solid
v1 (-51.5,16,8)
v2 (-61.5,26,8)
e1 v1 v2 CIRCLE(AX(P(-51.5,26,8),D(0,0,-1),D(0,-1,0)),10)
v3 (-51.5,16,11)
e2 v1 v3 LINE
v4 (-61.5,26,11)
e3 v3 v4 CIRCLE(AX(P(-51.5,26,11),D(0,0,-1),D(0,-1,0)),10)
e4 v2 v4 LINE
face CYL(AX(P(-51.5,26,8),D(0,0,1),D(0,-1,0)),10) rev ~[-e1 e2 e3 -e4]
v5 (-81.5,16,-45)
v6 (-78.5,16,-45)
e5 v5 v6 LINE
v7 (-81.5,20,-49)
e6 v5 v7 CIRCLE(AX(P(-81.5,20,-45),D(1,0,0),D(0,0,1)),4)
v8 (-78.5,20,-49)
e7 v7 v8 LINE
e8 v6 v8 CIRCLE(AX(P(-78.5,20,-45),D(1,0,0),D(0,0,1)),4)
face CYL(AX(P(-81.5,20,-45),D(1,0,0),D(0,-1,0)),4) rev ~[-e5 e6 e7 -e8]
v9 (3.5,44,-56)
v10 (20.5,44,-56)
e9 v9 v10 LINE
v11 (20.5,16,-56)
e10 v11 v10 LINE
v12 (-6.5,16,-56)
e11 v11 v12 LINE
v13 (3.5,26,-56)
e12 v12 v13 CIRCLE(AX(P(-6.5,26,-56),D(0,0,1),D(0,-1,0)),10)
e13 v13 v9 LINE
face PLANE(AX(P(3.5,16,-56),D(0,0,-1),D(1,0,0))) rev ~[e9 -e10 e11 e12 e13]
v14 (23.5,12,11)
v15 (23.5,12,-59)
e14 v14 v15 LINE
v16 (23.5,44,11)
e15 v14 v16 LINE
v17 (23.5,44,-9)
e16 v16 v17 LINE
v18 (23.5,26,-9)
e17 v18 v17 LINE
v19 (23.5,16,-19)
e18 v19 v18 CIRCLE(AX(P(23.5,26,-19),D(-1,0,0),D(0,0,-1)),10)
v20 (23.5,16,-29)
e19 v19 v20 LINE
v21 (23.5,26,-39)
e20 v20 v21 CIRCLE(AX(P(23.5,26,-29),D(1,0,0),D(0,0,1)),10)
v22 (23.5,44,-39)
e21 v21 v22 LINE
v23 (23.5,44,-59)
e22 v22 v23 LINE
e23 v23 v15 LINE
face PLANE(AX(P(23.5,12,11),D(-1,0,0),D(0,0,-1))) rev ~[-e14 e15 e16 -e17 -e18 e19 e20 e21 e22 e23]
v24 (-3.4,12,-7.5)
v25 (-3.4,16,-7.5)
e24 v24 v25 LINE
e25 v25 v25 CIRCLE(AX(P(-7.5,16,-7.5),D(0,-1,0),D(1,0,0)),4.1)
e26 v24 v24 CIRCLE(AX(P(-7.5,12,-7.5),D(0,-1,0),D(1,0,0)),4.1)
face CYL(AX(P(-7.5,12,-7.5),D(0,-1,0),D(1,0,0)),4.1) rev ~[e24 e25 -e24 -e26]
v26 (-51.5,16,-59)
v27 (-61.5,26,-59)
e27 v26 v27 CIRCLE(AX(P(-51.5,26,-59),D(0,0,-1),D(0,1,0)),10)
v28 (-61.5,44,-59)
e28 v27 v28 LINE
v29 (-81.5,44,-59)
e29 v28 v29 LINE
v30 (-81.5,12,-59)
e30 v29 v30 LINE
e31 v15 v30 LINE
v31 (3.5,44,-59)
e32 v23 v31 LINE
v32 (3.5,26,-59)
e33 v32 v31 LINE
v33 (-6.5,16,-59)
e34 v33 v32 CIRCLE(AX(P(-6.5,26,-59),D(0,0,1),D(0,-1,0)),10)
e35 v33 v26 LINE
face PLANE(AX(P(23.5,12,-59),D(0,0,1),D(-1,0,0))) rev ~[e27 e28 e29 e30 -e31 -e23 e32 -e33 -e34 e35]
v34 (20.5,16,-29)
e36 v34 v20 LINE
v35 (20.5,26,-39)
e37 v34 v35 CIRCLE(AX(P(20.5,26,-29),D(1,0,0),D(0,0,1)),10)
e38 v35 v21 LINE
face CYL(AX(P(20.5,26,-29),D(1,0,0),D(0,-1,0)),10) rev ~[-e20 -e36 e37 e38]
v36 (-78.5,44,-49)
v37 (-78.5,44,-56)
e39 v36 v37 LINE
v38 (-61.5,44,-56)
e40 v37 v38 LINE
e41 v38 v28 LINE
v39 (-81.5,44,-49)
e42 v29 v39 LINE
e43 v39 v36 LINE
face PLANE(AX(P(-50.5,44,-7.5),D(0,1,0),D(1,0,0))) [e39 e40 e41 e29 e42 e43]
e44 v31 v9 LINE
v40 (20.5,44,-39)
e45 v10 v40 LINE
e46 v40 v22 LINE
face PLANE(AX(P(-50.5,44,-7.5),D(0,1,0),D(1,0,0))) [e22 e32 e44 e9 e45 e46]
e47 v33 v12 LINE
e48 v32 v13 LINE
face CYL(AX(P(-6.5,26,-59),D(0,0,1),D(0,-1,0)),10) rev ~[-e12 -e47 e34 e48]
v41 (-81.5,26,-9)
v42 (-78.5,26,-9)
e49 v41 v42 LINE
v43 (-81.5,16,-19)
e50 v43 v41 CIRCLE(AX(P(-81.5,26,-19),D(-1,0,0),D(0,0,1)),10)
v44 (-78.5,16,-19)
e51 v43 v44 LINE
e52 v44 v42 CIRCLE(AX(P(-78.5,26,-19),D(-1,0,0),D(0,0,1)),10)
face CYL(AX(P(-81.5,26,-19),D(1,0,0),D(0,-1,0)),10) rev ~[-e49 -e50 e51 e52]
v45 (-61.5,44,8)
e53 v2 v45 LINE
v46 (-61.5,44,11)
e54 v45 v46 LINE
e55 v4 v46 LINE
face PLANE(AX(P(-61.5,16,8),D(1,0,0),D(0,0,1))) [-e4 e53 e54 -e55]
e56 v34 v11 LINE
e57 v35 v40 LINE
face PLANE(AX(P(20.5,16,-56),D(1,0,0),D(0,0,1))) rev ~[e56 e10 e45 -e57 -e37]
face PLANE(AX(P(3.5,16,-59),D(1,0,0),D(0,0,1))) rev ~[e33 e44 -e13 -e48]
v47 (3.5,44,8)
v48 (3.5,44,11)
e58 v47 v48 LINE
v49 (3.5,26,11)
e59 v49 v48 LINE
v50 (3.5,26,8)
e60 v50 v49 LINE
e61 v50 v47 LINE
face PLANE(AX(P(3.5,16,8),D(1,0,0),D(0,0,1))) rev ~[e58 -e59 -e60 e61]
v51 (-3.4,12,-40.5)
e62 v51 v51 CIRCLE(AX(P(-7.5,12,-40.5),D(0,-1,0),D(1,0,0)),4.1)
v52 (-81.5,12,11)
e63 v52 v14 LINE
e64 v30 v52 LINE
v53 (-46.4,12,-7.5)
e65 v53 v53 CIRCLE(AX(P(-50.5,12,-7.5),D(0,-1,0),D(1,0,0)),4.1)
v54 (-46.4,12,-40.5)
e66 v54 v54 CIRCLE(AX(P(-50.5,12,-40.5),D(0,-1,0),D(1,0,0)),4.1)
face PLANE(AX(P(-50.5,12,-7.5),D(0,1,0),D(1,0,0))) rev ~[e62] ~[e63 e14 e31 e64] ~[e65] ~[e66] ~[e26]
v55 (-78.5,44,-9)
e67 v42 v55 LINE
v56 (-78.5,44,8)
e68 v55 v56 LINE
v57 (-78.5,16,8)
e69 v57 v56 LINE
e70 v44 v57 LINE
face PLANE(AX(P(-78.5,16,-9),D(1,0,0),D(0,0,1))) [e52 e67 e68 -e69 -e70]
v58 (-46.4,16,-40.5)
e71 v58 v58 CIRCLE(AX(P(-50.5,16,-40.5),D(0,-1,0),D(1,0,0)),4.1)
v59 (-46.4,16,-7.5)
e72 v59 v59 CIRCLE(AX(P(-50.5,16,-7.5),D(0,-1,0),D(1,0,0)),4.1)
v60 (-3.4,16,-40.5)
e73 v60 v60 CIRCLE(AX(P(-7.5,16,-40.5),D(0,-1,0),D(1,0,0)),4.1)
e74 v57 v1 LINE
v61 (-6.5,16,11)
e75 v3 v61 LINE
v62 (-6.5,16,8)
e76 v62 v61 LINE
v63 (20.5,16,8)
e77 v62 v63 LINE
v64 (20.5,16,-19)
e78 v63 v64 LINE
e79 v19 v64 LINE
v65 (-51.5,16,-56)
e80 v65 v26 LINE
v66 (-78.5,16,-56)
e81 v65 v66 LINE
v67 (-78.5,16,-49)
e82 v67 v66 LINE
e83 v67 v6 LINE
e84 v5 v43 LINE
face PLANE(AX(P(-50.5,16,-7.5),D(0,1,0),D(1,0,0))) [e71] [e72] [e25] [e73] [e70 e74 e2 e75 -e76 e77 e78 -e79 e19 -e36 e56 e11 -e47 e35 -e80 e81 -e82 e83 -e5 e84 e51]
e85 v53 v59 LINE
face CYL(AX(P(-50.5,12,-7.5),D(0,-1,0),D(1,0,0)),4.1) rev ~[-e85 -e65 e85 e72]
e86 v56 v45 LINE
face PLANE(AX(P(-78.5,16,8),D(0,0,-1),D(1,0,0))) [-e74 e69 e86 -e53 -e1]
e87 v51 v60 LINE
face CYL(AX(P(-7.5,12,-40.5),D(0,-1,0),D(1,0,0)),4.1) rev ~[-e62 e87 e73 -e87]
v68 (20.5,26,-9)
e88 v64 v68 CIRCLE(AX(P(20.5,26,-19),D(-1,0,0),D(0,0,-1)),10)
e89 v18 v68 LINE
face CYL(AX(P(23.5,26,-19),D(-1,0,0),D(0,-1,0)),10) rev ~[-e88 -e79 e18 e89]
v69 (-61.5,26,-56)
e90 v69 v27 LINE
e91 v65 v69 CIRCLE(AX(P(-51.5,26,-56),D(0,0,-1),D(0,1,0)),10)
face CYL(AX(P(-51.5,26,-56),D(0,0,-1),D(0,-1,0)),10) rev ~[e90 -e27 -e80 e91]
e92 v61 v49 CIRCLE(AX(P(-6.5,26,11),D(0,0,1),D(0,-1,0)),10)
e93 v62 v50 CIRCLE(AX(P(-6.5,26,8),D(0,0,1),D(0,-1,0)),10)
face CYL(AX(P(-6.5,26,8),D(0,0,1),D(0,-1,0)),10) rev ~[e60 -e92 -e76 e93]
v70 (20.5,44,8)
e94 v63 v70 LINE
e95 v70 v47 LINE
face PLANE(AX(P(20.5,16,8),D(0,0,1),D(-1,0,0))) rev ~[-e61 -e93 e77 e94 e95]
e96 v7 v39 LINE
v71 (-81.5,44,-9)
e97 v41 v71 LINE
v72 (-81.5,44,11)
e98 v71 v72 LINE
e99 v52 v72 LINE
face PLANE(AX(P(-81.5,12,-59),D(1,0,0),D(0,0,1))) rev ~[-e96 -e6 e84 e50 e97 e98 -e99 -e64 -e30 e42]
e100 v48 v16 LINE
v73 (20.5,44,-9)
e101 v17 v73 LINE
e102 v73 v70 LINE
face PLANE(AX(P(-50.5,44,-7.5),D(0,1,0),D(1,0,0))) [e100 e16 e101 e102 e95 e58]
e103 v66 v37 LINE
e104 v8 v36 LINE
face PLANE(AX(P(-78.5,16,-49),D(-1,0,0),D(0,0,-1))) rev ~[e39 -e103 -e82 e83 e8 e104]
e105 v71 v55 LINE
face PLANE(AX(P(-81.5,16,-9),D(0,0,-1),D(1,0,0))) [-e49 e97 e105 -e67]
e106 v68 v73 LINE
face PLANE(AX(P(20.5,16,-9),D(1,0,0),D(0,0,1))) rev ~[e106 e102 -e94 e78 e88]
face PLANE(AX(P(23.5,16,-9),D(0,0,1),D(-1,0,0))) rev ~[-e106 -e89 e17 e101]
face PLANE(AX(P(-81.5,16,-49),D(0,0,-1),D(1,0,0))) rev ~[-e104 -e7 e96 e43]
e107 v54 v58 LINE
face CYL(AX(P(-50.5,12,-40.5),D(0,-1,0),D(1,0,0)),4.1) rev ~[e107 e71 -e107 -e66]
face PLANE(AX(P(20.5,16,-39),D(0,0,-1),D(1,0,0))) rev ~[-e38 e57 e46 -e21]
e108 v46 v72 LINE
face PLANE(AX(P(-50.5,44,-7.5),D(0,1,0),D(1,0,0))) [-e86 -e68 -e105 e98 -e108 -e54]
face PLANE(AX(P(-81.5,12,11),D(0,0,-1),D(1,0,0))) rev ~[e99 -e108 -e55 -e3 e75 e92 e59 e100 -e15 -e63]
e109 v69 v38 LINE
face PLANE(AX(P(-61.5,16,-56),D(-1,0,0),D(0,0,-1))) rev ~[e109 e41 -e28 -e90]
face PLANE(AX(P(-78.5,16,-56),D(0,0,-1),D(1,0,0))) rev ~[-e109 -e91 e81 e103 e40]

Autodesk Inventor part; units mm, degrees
ref_plane "YZ Plane" through (0, 0, 0) normal (1, 0, 0) x (0, 1, 0)
ref_plane "XZ Plane" through (0, 0, 0) normal (0, 1, 0) x (-1, 0, 0)
ref_plane "XY Plane" through (0, 0, 0) normal (0, 0, 1) x (1, 0, 0)
sketch "Sketch1" plane through (0, 0, 0) normal (0, 1, 0) x (-1, 0, 0)
  line L0 (0, 0) -> (58, 0) construction
  line L1 (58, 0) -> (58, -48) construction
  line L2 (58, -48) -> (0, -48) construction
  line L3 (0, -48) -> (0, 0) construction
  circle A0 centre (50.5, -7.5) radius 2.35
  circle A1 centre (50.5, -40.5) radius 2.35
  circle A2 centre (7.5, -7.5) radius 2.35
  circle A3 centre (7.5, -40.5) radius 2.35
  circle A4 centre (50.5, -7.5) radius 5
  circle A5 centre (50.5, -40.5) radius 5
  circle A6 centre (7.5, -7.5) radius 5
  circle A7 centre (7.5, -40.5) radius 5
  dimension "d0" = 58
  dimension "d1" = 48
  dimension "d2" = 4.7
  dimension "d3" = 4.7
  dimension "d4" = 4.7
  dimension "d5" = 4.7
  dimension "d6" = 33
  dimension "d7" = 43
  dimension "d8" = 7.5
  dimension "d9" = 7.5
  dimension "d10" = 7.5
  dimension "d11" = 7.5
  dimension "d12" = 7.5
  dimension "d13" = 7.5
  dimension "d14" = 10
  dimension "d15" = 10
  dimension "d16" = 10
  dimension "d17" = 10
extrude "Extrusion1" add sketch "Sketch1" along normal blind 12
sketch "Sketch2" plane through (-50.5, 12, -7.5) normal (0, 1, 0) x (1, 0, 0)
  line L0 (-31, -18.5) -> (74, -18.5)
  line L1 (74, -18.5) -> (74, 51.5)
  line L2 (74, 51.5) -> (-31, 51.5)
  line L3 (-31, 51.5) -> (-31, -18.5)
  circle A0 centre (0, 0) radius 2.35 projected
  circle A1 centre (0, 33) radius 2.35 projected
  circle A2 centre (43, 33) radius 2.35 projected
  circle A3 centre (43, 0) radius 2.35 projected
  circle A4 centre (43, 0) radius 2.35
  point P0 (50.5, -7.5)
  dimension "d20" = 105
  dimension "d21" = 70
  dimension "d22" = 18.5
  dimension "d23" = 31
extrude "Extrusion3" add sketch "Sketch2" along normal blind 4
sketch "Sketch3" plane through (-50.5, 16, -7.5) normal (0, 1, 0) x (1, 0, 0)
  line L0 (-31, 51.5) -> (-31, -18.5) projected
  line L1 (-31, -18.5) -> (-31, 1.5)
  line L2 (-31, 1.5) -> (-28, 1.5)
  line L3 (-28, 1.5) -> (-28, -15.5)
  line L4 (-28, -15.5) -> (-11, -15.5)
  line L5 (-11, -15.5) -> (-11, -18.5)
  line L6 (-11, -18.5) -> (-31, -18.5)
  line L7 (-28, 48.5) -> (-11, 48.5)
  line L8 (-11, 48.5) -> (-11, 51.5)
  line L9 (74, -18.5) -> (74, 51.5) projected
  line L10 (74, 51.5) -> (54, 51.5)
  line L11 (54, 51.5) -> (54, 48.5)
  line L12 (71, 31.5) -> (74, 31.5)
  line L13 (74, 31.5) -> (74, 51.5)
  line L14 (74, -18.5) -> (74, 1.5)
  line L15 (74, 1.5) -> (71, 1.5)
  line L16 (71, 1.5) -> (71, -15.5)
  line L17 (71, -15.5) -> (54, -15.5)
  line L18 (54, -15.5) -> (54, -18.5)
  line L19 (54, -18.5) -> (74, -18.5)
  line L20 (74, 51.5) -> (-31, 51.5) projected
  line L21 (54, 48.5) -> (71, 48.5)
  line L22 (71, 48.5) -> (71, 31.5)
  line L23 (-11, 51.5) -> (-31, 51.5)
  line L24 (-31, 51.5) -> (-31, 41.5)
  line L25 (-31, 41.5) -> (-28, 41.5)
  line L26 (-28, 41.5) -> (-28, 48.5)
  point P0 (50.5, -7.5)
  dimension "d28" = 20
  dimension "d37" = 3
  dimension "d48" = 20
  dimension "d49" = 3
  dimension "d50" = 3
  dimension "d51" = 3
  dimension "d52" = 3
  dimension "d53" = 20
  dimension "d54" = 20
  dimension "d55" = 20
  dimension "d56" = 20
  dimension "d57" = 3
  dimension "d58" = 3
  dimension "d69" = 10
  dimension "d70" = 7
extrude "Extrusion4" add sketch "Sketch3" along normal blind 28
fillet "Fillet1" radius 10 7 edges at (-61.5, 16, 9.5) (-80, 16, -9) (-61.5, 16, -57.5) (3.5, 16, -57.5) (22, 16, -39) (22, 16, -9) (3.5, 16, 9.5)
sketch "Sketch4" plane through (-81.5, 12, 11) normal (0, 0, 1) x (1, 0, 0)
  line L0 (0, 0) -> (0, 32) projected
  line L1 (0, 0) -> (100, 0)
  line L2 (100, 0) -> (100, -15)
  line L3 (100, -15) -> (0, -15)
  line L4 (0, -15) -> (0, 0)
  point P0 (81.5, -12)
  dimension "d59" = 100
  dimension "d60" = 15
extrude "remove legs" cut sketch "Sketch4" against normal through all
sketch "Sketch5" plane through (-50.5, 12, -7.5) normal (0, -1, 0) x (1, 0, 0)
  circle A0 centre (0, 0) radius 2.35 projected
  circle A1 centre (0, 0) radius 4.1
  circle A2 centre (43, 0) radius 2.35 projected
  circle A3 centre (43, 0) radius 4.1
  circle A4 centre (43, -33) radius 2.35 projected
  circle A5 centre (43, -33) radius 4.1
  circle A6 centre (0, -33) radius 2.35 projected
  circle A7 centre (0, -33) radius 4.1
  circle A8 centre (0, 0) radius 2.35
  circle A9 centre (43, 0) radius 2.35
  circle A10 centre (43, -33) radius 2.35
  circle A11 centre (0, -33) radius 2.35
  point P0 (50.5, 7.5)
  dimension "d63" = 8.2
  dimension "d64" = 8.2
  dimension "d65" = 8.2
  dimension "d66" = 8.2
extrude "Extrusion6" cut sketch "Sketch5" against normal blind 4
fillet "Fillet2" radius 4 1 edges at (-80, 16, -49)
properties part number "TestingPlatform_base01"
